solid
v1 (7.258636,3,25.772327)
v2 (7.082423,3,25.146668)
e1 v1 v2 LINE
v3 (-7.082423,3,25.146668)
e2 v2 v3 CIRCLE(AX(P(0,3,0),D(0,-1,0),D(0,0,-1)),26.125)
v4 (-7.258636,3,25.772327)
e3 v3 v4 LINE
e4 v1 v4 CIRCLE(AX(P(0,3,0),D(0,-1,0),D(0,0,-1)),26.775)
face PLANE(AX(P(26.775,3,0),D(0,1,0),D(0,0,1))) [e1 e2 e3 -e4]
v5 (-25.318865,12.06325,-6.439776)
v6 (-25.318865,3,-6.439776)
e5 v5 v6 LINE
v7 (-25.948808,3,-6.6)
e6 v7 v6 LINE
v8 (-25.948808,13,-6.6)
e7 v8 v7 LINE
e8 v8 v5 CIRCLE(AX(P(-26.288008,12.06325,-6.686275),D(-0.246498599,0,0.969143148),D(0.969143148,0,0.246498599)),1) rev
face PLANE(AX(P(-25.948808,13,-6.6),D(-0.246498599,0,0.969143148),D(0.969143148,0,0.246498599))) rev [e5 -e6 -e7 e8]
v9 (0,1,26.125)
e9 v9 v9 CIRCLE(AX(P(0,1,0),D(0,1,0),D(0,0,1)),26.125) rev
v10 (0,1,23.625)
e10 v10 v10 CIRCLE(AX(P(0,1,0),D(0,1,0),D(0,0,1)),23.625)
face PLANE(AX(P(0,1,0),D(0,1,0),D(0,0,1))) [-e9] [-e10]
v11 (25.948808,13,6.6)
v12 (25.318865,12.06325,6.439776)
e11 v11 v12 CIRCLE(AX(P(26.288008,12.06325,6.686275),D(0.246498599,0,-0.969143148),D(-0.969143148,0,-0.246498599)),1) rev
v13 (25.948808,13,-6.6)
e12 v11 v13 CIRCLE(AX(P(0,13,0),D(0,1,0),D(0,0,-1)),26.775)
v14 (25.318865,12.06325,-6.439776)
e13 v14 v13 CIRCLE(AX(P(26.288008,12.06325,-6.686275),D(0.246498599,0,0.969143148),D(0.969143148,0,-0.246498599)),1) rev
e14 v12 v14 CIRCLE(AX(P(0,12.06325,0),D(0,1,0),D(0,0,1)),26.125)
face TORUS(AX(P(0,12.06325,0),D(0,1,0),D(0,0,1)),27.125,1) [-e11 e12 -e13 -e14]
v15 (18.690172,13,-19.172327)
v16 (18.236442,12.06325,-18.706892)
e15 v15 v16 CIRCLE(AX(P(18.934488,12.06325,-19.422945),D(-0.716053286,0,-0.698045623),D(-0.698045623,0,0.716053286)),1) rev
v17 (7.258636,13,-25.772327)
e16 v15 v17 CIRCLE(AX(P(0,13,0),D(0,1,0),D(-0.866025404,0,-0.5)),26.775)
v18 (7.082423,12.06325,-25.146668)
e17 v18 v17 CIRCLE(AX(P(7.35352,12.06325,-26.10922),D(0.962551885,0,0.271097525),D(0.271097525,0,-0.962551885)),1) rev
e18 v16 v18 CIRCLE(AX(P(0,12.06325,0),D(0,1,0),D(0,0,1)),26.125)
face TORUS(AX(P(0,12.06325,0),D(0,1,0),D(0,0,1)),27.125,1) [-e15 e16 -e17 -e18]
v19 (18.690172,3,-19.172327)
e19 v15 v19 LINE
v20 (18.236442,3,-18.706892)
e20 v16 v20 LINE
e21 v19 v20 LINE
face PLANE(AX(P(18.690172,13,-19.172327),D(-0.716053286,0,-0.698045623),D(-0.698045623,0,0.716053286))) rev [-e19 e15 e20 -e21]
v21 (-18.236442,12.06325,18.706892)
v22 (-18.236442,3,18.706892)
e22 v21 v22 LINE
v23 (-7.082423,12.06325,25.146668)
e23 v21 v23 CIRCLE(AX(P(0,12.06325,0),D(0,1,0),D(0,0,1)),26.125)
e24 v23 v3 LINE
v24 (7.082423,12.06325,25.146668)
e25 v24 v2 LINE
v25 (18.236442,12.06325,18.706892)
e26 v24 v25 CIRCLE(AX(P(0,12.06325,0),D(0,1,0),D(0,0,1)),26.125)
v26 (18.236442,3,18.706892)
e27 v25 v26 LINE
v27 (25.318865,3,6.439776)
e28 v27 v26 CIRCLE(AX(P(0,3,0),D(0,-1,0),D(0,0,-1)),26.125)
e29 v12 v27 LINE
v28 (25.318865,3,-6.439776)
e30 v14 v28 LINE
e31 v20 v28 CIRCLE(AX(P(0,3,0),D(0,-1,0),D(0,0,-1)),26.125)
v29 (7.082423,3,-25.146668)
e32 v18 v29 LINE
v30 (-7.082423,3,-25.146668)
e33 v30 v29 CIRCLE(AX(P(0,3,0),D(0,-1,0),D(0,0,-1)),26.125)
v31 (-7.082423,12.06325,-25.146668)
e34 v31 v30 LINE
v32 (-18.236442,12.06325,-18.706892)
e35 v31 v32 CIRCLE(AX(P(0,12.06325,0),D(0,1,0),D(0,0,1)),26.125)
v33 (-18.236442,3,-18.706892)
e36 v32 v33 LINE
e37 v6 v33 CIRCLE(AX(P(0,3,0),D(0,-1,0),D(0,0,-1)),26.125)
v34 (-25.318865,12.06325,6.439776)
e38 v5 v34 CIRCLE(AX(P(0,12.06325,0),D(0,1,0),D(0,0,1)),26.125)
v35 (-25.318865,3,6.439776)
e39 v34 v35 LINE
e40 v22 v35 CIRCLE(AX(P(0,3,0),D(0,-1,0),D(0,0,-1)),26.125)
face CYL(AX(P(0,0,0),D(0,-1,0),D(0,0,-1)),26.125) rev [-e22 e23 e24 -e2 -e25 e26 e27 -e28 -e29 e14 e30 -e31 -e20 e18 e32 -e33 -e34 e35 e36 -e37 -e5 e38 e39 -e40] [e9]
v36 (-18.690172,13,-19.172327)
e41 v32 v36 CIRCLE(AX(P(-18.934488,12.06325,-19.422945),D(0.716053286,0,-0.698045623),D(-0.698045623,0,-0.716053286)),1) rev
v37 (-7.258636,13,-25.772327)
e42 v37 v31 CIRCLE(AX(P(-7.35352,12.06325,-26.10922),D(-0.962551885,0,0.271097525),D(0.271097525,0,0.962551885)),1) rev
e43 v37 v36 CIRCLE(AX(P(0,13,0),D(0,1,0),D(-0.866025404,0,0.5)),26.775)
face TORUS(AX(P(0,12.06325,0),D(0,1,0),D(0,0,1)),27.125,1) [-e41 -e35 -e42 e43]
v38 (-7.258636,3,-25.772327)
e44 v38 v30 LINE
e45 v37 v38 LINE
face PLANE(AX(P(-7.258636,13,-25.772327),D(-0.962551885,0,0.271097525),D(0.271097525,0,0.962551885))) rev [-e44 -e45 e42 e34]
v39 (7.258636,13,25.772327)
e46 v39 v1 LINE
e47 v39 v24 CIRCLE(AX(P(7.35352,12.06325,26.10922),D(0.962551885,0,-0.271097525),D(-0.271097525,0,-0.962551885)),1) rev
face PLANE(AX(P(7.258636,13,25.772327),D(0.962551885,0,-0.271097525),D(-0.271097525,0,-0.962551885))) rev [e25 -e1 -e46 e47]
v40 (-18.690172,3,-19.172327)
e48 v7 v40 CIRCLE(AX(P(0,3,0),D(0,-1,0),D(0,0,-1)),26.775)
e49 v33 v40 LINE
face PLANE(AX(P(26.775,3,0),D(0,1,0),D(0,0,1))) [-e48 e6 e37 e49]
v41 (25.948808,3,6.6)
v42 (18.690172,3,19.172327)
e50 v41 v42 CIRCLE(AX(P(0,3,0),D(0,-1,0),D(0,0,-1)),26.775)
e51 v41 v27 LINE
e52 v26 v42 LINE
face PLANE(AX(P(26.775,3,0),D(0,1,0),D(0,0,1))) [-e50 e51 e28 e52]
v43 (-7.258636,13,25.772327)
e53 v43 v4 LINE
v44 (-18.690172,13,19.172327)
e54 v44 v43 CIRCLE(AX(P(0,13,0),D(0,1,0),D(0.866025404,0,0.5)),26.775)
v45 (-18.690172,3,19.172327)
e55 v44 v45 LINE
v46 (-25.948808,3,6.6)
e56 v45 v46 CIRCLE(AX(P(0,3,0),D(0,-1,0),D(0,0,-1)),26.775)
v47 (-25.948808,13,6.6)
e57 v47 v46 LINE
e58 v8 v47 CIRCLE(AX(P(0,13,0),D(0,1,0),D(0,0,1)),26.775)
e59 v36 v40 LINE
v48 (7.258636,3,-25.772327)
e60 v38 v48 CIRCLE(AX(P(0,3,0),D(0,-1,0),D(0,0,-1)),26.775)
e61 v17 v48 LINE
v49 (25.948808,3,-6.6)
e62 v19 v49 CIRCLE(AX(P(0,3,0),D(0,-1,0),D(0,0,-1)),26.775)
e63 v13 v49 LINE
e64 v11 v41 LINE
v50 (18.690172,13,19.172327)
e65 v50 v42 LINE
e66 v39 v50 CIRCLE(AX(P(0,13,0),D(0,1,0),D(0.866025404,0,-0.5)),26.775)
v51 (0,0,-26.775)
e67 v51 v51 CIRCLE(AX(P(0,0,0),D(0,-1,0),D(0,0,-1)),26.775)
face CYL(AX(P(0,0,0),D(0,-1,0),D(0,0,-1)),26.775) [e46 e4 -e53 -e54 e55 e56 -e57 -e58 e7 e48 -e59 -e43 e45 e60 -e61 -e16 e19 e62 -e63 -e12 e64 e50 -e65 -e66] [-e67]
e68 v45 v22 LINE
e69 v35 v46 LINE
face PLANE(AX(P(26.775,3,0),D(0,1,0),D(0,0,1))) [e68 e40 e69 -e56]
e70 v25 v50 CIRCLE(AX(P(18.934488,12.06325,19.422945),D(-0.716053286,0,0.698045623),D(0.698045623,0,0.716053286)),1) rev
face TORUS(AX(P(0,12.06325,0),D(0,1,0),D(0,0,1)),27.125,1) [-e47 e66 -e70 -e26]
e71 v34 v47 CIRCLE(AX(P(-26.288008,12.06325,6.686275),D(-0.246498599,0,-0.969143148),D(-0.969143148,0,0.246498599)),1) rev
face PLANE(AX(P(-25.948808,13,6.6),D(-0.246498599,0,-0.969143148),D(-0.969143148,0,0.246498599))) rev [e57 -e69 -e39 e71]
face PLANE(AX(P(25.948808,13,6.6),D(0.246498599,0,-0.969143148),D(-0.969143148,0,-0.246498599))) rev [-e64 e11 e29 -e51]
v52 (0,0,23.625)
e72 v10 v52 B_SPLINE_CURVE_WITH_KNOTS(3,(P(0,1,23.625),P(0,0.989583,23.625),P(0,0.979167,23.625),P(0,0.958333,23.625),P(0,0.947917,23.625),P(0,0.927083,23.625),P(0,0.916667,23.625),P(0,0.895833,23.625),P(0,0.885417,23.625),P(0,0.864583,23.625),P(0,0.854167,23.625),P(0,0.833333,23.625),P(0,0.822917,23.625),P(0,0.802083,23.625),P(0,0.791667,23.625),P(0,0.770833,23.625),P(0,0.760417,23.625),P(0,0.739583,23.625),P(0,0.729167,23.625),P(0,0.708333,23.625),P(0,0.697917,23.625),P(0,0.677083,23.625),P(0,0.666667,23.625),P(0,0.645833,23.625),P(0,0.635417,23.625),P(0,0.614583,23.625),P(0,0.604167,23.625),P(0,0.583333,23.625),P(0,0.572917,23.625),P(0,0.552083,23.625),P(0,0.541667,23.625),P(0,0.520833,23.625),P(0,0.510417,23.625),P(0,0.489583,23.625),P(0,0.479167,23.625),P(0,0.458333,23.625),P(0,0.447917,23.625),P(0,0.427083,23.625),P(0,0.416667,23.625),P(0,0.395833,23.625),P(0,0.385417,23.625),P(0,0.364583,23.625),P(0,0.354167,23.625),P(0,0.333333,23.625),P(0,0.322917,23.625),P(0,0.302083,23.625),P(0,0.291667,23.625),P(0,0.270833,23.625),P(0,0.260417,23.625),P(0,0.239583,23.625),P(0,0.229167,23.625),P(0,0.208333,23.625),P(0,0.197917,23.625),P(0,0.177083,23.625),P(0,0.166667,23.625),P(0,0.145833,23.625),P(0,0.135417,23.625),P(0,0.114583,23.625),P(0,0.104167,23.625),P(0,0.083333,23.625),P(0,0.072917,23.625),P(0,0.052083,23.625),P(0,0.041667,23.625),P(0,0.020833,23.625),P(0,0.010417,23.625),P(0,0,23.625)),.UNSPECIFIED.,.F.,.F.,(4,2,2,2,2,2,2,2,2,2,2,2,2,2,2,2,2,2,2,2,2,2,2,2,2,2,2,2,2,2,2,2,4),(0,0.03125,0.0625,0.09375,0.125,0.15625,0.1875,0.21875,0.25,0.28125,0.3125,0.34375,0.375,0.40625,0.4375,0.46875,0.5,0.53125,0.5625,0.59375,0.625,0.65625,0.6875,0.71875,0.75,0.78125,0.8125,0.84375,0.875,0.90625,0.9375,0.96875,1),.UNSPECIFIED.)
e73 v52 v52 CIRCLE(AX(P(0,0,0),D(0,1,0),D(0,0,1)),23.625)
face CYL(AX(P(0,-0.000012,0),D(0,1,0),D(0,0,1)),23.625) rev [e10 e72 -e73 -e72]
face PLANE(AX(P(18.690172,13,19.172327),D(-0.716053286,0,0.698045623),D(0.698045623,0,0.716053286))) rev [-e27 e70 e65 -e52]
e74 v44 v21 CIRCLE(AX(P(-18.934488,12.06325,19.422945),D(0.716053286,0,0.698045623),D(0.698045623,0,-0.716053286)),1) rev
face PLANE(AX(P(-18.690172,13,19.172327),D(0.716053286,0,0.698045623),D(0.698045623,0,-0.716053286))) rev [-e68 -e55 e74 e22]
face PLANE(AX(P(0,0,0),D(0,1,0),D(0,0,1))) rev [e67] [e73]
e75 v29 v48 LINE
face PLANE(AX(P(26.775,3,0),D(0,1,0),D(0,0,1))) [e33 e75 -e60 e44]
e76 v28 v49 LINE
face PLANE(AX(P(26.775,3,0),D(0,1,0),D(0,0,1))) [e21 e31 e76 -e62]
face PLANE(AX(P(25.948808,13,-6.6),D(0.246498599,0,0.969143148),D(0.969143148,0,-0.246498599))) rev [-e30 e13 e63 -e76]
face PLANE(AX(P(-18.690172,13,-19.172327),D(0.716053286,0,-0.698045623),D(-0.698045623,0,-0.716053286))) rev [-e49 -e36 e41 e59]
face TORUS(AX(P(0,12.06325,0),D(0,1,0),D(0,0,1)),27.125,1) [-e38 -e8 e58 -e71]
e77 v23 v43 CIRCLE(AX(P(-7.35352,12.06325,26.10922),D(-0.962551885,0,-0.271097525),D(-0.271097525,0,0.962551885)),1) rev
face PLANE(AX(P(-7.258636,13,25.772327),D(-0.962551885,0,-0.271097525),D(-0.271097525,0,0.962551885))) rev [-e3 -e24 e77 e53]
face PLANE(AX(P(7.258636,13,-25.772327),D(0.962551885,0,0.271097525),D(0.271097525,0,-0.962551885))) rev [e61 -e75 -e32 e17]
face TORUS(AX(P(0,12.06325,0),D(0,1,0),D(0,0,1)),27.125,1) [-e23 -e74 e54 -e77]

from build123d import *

# Parameters (mm, degrees)
SKETCH1_R                = 26.125
BOSS_EXTRUDE1_DEPTH      = 1
SKETCH2_W                = 0.65
SKETCH2_H                = 3
CUT_EXTRUDE2_DEPTH       = 38.984224
CUT_EXTRUDE2_DEPTH_BACK  = 38.984224
SKETCH3_R                = 23.625
BOSS_EXTRUDE2_DEPTH      = 13
FILLET1_R                = 1
CIRPATTERN1_COUNT        = 6
FILLET1_OF_CIRPATTERN1_R = 1


with BuildPart() as part:
    # Sketch1 → Boss-Extrude1 (new body)
    with BuildSketch(Plane(origin=(0, 0, 0), x_dir=(1, 0, 0), z_dir=(0, 1, 0))):
        with Locations(Location((0, 0, 0), (0, 0, 270))):
            Circle(SKETCH1_R)
    extrude(amount=BOSS_EXTRUDE1_DEPTH)

    # Sketch2 → Revolve1 (revolve)
    with BuildSketch(Plane.XY, mode=Mode.PRIVATE) as revolve1_sk:
        with Locations((26.45, 1.5)):
            Rectangle(SKETCH2_W, SKETCH2_H)
    revolve(revolve1_sk.sketch.rotate(Axis((0, 0, 0), (0, 1, 0)), 90), axis=Axis((0, 0, 0), (0, 1, 0)))

    # Sketch3 → Cut-Extrude2 (cut, two sides: drawn at the far end of the back side and taken through both)
    with BuildSketch(Plane(origin=(0, 0, 0), x_dir=(1, 0, 0), z_dir=(0, 1, 0)).offset(-CUT_EXTRUDE2_DEPTH_BACK)):
        with Locations(Location((0, 0, 0), (0, 0, 270))):
            Circle(SKETCH3_R)
    extrude(amount=CUT_EXTRUDE2_DEPTH + CUT_EXTRUDE2_DEPTH_BACK, mode=Mode.SUBTRACT)

    # Sketch5 → Boss-Extrude2 (add)
    with BuildSketch(Plane(origin=(0, 0, 0), x_dir=(1, 0, 0), z_dir=(0, 1, 0))):
        with BuildLine():
            Line((25.948808, 6.6), (25.318865, 6.439776))
            ThreePointArc((25.318865, 6.439776), (26.125, 0), (25.318865, -6.439776))
            Line((25.318865, -6.439776), (25.948808, -6.6))
            ThreePointArc((25.948808, -6.6), (26.775, 0), (25.948808, 6.6))
        make_face()
    boss_extrude2 = extrude(amount=BOSS_EXTRUDE2_DEPTH)

    # Fillet1
    # the kernel refuses this fillet: 1 mm, written as the material it takes off along each edge
    with BuildSketch(Plane(origin=(0, 13, 0), x_dir=(0.9431839321448116, 0, -0.33227107930701955), z_dir=(-0.33227107930701955, 0, -0.9431839321448116))) as fillet1_piece_1:
        with BuildLine():
            CenterArc((27.125, 0.93675), FILLET1_R, 180, 69.512685)
            Line((26.125, 0.93675), (26.105, 0.93675))
            Line((26.105, 0.93675), (26.105, 0))
            Line((26.105, 0), (26.125, -0.02))
            ThreePointArc((26.125, -0.02), (26.45, -0.02), (26.768, -0.018735))
            Line((26.768, -0.018735), (26.775, 0))
        make_face()
    revolve(axis=Axis((0, 13, 0), (0, -1, 0)), revolution_arc=38.813358, mode=Mode.SUBTRACT)

    # CirPattern1: Boss-Extrude2 ×6 about axis
    cirpattern1_axis = Axis((0, 0, 0), (0, 1, 0))
    for i in range(1, CIRPATTERN1_COUNT):
        add(boss_extrude2.rotate(cirpattern1_axis, i * 360 / CIRPATTERN1_COUNT))

    # Fillet1 of CirPattern1
    # the kernel refuses this fillet: 1 mm, written as the material it takes off along each edge
    with BuildSketch(Plane(origin=(0, 13, 0), x_dir=(0.18383677044965302, 0, -0.9829567853322146), z_dir=(-0.9829567853322146, 0, -0.18383677044965302))) as fillet1_of_cirpattern1_piece_1:
        with BuildLine():
            CenterArc((27.125, 0.93675), FILLET1_OF_CIRPATTERN1_R, 180, 69.512685)
            Line((26.125, 0.93675), (26.105, 0.93675))
            Line((26.105, 0.93675), (26.105, 0))
            Line((26.105, 0), (26.125, -0.02))
            ThreePointArc((26.125, -0.02), (26.45, -0.02), (26.768, -0.018735))
            Line((26.768, -0.018735), (26.775, 0))
        make_face()
    revolve(axis=Axis((0, 13, 0), (0, -1, 0)), revolution_arc=38.813358, mode=Mode.SUBTRACT)
    with BuildSketch(Plane(origin=(0, 13, 0), x_dir=(-0.7593471616951585, 0, -0.6506857060251953), z_dir=(-0.6506857060251953, 0, 0.7593471616951585))) as fillet1_of_cirpattern1_piece_2:
        with BuildLine():
            CenterArc((27.125, 0.93675), FILLET1_OF_CIRPATTERN1_R, 180, 69.512685)
            Line((26.125, 0.93675), (26.105, 0.93675))
            Line((26.105, 0.93675), (26.105, 0))
            Line((26.105, 0), (26.125, -0.02))
            ThreePointArc((26.125, -0.02), (26.45, -0.02), (26.768, -0.018735))
            Line((26.768, -0.018735), (26.775, 0))
        make_face()
    revolve(axis=Axis((0, 13, 0), (0, -1, 0)), revolution_arc=38.813358, mode=Mode.SUBTRACT)
    with BuildSketch(Plane(origin=(0, 13, 0), x_dir=(-0.9431839321448114, 0, 0.3322710793070194), z_dir=(0.3322710793070194, 0, 0.9431839321448114))) as fillet1_of_cirpattern1_piece_3:
        with BuildLine():
            CenterArc((27.125, 0.93675), FILLET1_OF_CIRPATTERN1_R, 180, 69.512685)
            Line((26.125, 0.93675), (26.105, 0.93675))
            Line((26.105, 0.93675), (26.105, 0))
            Line((26.105, 0), (26.125, -0.02))
            ThreePointArc((26.125, -0.02), (26.45, -0.02), (26.768, -0.018735))
            Line((26.768, -0.018735), (26.775, 0))
        make_face()
    revolve(axis=Axis((0, 13, 0), (0, -1, 0)), revolution_arc=38.813358, mode=Mode.SUBTRACT)
    with BuildSketch(Plane(origin=(0, 13, 0), x_dir=(-0.18383677044965369, 0, 0.9829567853322146), z_dir=(0.9829567853322146, 0, 0.18383677044965369))) as fillet1_of_cirpattern1_piece_4:
        with BuildLine():
            CenterArc((27.125, 0.93675), FILLET1_OF_CIRPATTERN1_R, 180, 69.512685)
            Line((26.125, 0.93675), (26.105, 0.93675))
            Line((26.105, 0.93675), (26.105, 0))
            Line((26.105, 0), (26.125, -0.02))
            ThreePointArc((26.125, -0.02), (26.45, -0.02), (26.768, -0.018735))
            Line((26.768, -0.018735), (26.775, 0))
        make_face()
    revolve(axis=Axis((0, 13, 0), (0, -1, 0)), revolution_arc=38.813358, mode=Mode.SUBTRACT)
    with BuildSketch(Plane(origin=(0, 13, 0), x_dir=(0.7593471616951586, 0, 0.6506857060251952), z_dir=(0.6506857060251952, 0, -0.7593471616951586))) as fillet1_of_cirpattern1_piece_5:
        with BuildLine():
            CenterArc((27.125, 0.93675), FILLET1_OF_CIRPATTERN1_R, 180, 69.512685)
            Line((26.125, 0.93675), (26.105, 0.93675))
            Line((26.105, 0.93675), (26.105, 0))
            Line((26.105, 0), (26.125, -0.02))
            ThreePointArc((26.125, -0.02), (26.45, -0.02), (26.768, -0.018735))
            Line((26.768, -0.018735), (26.775, 0))
        make_face()
    revolve(axis=Axis((0, 13, 0), (0, -1, 0)), revolution_arc=38.813358, mode=Mode.SUBTRACT)


solid = part.part
